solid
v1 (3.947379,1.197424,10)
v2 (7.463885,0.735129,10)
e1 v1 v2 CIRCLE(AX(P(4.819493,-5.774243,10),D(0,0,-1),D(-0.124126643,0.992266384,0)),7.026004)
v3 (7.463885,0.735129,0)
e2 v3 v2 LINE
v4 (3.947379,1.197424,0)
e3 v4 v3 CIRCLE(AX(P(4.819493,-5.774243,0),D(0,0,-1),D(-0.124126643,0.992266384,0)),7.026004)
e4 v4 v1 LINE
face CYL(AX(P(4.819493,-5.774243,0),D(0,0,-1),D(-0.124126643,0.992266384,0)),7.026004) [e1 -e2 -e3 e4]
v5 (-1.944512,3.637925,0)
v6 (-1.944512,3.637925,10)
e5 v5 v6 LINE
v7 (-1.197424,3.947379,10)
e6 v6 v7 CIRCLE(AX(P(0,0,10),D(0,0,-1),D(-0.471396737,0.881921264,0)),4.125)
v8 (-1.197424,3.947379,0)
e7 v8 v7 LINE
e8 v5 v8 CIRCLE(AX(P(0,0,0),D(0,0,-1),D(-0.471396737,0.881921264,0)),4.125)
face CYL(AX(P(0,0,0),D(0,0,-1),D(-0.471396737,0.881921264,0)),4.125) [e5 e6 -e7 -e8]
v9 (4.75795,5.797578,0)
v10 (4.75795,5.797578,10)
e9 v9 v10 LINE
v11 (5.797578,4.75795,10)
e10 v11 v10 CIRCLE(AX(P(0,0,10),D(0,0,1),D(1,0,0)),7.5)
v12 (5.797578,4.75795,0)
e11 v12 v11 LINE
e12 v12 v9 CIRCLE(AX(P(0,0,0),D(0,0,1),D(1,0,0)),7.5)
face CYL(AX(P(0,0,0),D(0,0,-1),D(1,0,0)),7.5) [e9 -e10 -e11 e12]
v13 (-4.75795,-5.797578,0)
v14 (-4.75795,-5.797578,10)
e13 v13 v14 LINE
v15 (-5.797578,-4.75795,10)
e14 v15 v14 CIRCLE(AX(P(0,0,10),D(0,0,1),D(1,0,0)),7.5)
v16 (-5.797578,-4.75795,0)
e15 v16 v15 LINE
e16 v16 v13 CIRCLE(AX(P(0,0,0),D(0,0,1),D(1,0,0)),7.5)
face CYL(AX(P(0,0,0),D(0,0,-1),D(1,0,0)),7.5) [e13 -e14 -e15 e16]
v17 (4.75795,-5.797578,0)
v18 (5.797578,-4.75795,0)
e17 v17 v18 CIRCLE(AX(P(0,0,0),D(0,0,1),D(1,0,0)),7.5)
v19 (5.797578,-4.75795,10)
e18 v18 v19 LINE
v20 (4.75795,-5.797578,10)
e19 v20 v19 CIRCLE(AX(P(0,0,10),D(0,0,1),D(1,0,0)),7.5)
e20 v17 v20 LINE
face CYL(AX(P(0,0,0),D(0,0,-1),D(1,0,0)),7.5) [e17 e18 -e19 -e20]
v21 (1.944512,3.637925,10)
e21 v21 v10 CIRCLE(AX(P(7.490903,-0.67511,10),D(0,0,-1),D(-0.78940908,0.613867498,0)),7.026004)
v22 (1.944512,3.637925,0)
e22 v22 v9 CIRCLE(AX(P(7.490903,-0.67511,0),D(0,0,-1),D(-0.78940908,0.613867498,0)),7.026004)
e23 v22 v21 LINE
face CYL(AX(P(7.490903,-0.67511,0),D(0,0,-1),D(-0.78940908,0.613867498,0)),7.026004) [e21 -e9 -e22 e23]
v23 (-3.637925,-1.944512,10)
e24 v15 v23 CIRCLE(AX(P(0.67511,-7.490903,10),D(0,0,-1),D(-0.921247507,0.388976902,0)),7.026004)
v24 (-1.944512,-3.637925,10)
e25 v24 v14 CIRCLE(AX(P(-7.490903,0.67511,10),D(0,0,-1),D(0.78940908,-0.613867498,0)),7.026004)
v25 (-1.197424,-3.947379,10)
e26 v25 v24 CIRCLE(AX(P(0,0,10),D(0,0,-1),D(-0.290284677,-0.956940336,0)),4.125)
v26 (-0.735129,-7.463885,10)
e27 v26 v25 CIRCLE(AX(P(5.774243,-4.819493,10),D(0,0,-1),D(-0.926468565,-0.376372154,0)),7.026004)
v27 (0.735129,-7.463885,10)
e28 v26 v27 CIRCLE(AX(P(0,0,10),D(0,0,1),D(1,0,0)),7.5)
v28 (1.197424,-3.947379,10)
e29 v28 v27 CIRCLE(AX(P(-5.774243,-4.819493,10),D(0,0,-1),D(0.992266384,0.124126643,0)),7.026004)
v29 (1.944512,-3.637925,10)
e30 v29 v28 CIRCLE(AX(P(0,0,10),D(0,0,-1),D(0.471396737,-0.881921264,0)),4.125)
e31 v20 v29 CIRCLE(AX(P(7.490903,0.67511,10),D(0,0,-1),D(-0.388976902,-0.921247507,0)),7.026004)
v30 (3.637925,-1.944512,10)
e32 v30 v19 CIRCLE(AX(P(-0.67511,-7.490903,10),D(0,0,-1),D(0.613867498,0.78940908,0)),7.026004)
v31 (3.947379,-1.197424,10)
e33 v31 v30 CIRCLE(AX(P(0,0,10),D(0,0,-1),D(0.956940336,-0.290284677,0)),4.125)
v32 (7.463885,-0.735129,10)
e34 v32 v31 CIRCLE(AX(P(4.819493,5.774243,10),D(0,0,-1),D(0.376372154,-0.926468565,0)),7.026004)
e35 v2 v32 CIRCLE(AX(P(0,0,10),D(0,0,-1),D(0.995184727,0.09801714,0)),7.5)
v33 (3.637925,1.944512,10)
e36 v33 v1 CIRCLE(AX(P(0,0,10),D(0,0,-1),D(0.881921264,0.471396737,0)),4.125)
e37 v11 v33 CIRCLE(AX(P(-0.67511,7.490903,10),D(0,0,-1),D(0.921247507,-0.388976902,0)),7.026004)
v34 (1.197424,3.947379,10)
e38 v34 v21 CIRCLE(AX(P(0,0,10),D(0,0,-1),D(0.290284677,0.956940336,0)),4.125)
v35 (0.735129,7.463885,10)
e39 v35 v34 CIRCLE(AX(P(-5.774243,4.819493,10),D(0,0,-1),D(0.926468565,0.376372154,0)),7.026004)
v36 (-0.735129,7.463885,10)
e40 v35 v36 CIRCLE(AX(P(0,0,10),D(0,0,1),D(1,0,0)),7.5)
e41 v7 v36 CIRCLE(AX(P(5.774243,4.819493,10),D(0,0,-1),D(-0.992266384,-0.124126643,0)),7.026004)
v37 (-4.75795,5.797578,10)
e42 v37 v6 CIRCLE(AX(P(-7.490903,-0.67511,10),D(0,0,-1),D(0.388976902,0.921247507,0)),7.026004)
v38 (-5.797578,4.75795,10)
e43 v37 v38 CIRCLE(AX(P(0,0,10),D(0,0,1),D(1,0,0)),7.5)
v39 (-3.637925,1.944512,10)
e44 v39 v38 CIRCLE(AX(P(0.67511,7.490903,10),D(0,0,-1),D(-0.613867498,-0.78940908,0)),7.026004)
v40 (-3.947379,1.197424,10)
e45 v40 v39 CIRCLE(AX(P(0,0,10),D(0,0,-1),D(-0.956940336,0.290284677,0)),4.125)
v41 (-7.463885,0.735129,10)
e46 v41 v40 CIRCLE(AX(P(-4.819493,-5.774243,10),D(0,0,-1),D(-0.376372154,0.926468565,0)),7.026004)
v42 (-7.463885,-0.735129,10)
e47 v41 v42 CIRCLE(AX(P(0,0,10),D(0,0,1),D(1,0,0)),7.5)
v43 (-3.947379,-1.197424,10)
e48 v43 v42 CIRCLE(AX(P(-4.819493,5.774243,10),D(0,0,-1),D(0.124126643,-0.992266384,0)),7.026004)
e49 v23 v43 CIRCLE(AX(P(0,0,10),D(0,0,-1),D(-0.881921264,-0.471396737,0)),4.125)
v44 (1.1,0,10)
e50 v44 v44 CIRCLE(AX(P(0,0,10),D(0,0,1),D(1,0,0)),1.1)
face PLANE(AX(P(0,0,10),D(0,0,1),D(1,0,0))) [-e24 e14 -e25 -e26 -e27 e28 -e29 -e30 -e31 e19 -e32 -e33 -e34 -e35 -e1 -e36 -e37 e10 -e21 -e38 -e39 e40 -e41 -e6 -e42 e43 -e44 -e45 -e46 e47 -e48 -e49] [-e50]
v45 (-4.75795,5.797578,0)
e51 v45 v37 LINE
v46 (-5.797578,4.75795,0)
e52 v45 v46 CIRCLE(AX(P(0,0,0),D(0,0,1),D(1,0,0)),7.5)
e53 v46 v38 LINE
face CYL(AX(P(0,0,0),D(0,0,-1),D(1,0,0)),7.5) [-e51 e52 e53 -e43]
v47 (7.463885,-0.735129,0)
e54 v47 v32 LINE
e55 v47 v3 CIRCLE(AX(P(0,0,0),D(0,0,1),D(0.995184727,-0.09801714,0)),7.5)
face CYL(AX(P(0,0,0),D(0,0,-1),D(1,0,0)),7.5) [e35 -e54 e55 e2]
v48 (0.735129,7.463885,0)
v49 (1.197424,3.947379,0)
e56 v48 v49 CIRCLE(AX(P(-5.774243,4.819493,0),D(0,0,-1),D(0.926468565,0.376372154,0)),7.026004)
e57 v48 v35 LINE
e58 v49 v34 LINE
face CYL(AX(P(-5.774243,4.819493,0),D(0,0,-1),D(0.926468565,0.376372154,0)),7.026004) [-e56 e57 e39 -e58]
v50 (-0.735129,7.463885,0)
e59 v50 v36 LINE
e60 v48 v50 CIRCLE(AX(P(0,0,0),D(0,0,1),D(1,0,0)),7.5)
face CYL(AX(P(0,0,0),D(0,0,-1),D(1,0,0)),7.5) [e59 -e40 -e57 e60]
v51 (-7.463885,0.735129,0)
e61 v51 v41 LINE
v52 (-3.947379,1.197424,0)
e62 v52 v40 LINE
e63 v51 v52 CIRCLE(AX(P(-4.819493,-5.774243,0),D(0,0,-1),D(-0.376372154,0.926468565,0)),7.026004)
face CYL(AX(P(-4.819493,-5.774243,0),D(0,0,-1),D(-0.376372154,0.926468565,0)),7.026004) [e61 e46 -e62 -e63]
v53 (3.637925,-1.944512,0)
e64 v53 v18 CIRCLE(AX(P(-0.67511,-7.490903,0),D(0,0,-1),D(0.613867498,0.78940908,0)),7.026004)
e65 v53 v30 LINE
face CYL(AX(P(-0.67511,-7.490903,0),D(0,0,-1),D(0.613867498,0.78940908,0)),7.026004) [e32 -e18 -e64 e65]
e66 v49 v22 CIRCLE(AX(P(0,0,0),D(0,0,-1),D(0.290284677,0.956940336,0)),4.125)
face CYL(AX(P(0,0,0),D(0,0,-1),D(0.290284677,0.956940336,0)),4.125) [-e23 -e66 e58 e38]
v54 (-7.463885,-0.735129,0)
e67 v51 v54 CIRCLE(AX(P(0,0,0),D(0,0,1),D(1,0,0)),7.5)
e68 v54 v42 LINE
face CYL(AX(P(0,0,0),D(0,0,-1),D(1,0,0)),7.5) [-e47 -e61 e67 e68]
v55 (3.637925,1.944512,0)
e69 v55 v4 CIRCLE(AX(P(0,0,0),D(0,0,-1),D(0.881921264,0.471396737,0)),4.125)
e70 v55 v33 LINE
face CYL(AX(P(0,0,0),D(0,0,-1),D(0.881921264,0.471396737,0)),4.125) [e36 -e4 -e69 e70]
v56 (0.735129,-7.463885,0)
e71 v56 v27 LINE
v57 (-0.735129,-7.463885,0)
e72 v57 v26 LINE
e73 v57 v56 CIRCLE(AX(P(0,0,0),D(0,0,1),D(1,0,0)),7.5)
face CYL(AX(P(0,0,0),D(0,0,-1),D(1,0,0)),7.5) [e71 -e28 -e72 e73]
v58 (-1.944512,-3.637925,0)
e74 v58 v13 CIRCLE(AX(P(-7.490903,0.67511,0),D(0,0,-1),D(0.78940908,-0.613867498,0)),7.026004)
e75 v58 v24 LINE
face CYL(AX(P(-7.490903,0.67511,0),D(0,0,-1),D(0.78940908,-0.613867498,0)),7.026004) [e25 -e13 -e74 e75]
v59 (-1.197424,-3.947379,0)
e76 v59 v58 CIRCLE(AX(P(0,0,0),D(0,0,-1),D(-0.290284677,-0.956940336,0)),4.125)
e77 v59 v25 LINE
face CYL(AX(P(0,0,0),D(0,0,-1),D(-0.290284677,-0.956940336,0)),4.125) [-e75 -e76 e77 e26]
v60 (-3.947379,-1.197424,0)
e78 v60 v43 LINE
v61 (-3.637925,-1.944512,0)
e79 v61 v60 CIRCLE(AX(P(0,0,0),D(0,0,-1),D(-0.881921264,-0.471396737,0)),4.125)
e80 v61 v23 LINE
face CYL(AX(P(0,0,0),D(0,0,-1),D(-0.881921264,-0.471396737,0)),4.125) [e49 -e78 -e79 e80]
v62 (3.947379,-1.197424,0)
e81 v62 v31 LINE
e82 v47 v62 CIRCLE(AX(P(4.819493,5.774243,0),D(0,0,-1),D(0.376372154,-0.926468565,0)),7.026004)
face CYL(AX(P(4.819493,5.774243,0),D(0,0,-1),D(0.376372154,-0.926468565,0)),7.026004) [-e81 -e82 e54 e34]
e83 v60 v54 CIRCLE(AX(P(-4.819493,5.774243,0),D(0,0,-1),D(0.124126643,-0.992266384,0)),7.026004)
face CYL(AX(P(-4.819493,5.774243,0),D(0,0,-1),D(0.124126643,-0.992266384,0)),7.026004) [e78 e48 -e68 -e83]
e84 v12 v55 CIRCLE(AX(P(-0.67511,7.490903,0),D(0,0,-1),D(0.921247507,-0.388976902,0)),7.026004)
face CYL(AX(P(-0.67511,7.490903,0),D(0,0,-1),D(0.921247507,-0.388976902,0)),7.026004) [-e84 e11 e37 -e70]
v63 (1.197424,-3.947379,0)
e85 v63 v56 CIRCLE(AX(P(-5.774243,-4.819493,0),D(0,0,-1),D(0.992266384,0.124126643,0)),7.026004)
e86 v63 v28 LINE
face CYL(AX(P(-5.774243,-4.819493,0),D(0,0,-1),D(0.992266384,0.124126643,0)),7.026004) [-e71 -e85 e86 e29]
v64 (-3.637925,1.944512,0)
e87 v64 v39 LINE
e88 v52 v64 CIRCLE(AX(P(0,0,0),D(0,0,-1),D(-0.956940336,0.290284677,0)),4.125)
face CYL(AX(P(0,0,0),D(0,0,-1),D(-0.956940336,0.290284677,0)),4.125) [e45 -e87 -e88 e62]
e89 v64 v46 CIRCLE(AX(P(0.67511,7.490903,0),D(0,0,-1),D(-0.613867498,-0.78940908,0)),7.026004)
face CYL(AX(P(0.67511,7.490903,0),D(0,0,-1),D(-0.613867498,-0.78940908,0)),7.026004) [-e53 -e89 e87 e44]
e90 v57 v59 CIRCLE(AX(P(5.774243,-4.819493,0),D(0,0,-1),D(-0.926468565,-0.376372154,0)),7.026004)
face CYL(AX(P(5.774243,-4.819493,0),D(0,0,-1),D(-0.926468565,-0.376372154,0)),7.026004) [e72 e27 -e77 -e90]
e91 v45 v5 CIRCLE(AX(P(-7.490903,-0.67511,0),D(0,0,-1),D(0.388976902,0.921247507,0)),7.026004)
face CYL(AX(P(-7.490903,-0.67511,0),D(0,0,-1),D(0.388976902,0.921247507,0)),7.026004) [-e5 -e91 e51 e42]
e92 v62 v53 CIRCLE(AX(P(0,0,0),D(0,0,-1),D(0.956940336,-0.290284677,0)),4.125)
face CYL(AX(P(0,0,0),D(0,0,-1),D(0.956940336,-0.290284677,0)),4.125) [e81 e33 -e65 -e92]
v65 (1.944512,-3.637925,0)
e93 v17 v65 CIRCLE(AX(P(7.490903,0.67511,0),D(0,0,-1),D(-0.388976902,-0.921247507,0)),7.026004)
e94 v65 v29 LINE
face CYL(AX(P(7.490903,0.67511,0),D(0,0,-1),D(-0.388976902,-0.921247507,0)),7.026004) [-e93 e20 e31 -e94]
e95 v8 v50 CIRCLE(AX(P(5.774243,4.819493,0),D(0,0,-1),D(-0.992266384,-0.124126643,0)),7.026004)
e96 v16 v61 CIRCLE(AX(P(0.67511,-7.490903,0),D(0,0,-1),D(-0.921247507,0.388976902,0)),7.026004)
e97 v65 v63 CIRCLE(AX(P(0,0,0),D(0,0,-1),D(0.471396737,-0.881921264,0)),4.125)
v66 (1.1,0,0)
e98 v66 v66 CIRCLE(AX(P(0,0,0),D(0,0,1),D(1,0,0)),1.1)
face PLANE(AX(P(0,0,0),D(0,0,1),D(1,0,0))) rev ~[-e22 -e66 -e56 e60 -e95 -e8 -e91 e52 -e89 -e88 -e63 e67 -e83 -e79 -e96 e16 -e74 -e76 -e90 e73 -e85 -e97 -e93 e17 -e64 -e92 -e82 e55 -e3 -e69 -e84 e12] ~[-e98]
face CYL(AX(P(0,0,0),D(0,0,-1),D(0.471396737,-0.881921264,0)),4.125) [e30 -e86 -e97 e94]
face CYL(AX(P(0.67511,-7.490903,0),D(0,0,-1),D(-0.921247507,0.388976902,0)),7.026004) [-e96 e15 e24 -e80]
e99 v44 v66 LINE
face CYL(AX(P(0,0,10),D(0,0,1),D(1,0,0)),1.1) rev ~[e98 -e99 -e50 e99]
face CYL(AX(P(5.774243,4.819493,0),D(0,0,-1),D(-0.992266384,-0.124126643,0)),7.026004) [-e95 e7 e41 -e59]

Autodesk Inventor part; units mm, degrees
sketch "Sketch1" plane through (0, 0, 0) normal (0, 0, 1) x (1, 0, 0)
  circle A0 centre (0, 0) radius 7.5
  dimension "d0" = 15
extrude "Extrusion1" add sketch "Sketch1" along normal blind 10
ref_plane "Work Plane2" through (0, 0, 5) normal (0, 0, 1) x (1, 0, 0)
sketch "Sketch2" plane through (0, 0, 0) normal (0, 0, -1) x (-1, 0, 0)
  circle A0 centre (0, 0) radius 7.5 projected
  circle A1 centre (0, 0) radius 6
  dimension "d3" = 12
surface extrude "Pitch Diameter" sketch "Sketch2" against normal through all shown no curves A1
ref_plane "Work Plane8" through (0, 0, 0) normal (0.9238795, 0.3826834, 0) x (0, 0, 1)
ref_plane "Work Plane9" through (0, 0, 0) normal (1, 0, 0) x (0, 1, 0)
spur gear teeth "Spur Gear" teeth 8 pitch diameter 12 tip diameter 15 root diameter 8.25 face width 10 start plane through (0, 0, 0) normal (0, 0, -1) x (-1, 0, 0)
sketch "Sketch3" plane through (0, 0, 10) normal (0, 0, 1) x (1, 0, 0)
  arc A0 (-4.7579, 5.7976) -> (-5.7976, 4.7579) centre (0, 0) ccw projected
  circle A1 centre (0, 0) radius 1.1
  dimension "d49" = 2.2
extrude "Extrusion2" cut sketch "Sketch3" against normal blind 10
equation "\"d0\" = da_da"
equation "\"d1\" = da_b"
equation "\"d3\" = da_dw"
equation "\"d16\" = da_aw"
equation "\"d43\" = da_aw"
equation "\"d46\" = da_aw"
equation "\"da_da\" = 15"
equation "\"da_b\" = 10"
equation "\"da_dw\" = 12"
equation "\"da_aw\" = 51"
properties part number "Spur Gear1" material "Steel, Alloy"
